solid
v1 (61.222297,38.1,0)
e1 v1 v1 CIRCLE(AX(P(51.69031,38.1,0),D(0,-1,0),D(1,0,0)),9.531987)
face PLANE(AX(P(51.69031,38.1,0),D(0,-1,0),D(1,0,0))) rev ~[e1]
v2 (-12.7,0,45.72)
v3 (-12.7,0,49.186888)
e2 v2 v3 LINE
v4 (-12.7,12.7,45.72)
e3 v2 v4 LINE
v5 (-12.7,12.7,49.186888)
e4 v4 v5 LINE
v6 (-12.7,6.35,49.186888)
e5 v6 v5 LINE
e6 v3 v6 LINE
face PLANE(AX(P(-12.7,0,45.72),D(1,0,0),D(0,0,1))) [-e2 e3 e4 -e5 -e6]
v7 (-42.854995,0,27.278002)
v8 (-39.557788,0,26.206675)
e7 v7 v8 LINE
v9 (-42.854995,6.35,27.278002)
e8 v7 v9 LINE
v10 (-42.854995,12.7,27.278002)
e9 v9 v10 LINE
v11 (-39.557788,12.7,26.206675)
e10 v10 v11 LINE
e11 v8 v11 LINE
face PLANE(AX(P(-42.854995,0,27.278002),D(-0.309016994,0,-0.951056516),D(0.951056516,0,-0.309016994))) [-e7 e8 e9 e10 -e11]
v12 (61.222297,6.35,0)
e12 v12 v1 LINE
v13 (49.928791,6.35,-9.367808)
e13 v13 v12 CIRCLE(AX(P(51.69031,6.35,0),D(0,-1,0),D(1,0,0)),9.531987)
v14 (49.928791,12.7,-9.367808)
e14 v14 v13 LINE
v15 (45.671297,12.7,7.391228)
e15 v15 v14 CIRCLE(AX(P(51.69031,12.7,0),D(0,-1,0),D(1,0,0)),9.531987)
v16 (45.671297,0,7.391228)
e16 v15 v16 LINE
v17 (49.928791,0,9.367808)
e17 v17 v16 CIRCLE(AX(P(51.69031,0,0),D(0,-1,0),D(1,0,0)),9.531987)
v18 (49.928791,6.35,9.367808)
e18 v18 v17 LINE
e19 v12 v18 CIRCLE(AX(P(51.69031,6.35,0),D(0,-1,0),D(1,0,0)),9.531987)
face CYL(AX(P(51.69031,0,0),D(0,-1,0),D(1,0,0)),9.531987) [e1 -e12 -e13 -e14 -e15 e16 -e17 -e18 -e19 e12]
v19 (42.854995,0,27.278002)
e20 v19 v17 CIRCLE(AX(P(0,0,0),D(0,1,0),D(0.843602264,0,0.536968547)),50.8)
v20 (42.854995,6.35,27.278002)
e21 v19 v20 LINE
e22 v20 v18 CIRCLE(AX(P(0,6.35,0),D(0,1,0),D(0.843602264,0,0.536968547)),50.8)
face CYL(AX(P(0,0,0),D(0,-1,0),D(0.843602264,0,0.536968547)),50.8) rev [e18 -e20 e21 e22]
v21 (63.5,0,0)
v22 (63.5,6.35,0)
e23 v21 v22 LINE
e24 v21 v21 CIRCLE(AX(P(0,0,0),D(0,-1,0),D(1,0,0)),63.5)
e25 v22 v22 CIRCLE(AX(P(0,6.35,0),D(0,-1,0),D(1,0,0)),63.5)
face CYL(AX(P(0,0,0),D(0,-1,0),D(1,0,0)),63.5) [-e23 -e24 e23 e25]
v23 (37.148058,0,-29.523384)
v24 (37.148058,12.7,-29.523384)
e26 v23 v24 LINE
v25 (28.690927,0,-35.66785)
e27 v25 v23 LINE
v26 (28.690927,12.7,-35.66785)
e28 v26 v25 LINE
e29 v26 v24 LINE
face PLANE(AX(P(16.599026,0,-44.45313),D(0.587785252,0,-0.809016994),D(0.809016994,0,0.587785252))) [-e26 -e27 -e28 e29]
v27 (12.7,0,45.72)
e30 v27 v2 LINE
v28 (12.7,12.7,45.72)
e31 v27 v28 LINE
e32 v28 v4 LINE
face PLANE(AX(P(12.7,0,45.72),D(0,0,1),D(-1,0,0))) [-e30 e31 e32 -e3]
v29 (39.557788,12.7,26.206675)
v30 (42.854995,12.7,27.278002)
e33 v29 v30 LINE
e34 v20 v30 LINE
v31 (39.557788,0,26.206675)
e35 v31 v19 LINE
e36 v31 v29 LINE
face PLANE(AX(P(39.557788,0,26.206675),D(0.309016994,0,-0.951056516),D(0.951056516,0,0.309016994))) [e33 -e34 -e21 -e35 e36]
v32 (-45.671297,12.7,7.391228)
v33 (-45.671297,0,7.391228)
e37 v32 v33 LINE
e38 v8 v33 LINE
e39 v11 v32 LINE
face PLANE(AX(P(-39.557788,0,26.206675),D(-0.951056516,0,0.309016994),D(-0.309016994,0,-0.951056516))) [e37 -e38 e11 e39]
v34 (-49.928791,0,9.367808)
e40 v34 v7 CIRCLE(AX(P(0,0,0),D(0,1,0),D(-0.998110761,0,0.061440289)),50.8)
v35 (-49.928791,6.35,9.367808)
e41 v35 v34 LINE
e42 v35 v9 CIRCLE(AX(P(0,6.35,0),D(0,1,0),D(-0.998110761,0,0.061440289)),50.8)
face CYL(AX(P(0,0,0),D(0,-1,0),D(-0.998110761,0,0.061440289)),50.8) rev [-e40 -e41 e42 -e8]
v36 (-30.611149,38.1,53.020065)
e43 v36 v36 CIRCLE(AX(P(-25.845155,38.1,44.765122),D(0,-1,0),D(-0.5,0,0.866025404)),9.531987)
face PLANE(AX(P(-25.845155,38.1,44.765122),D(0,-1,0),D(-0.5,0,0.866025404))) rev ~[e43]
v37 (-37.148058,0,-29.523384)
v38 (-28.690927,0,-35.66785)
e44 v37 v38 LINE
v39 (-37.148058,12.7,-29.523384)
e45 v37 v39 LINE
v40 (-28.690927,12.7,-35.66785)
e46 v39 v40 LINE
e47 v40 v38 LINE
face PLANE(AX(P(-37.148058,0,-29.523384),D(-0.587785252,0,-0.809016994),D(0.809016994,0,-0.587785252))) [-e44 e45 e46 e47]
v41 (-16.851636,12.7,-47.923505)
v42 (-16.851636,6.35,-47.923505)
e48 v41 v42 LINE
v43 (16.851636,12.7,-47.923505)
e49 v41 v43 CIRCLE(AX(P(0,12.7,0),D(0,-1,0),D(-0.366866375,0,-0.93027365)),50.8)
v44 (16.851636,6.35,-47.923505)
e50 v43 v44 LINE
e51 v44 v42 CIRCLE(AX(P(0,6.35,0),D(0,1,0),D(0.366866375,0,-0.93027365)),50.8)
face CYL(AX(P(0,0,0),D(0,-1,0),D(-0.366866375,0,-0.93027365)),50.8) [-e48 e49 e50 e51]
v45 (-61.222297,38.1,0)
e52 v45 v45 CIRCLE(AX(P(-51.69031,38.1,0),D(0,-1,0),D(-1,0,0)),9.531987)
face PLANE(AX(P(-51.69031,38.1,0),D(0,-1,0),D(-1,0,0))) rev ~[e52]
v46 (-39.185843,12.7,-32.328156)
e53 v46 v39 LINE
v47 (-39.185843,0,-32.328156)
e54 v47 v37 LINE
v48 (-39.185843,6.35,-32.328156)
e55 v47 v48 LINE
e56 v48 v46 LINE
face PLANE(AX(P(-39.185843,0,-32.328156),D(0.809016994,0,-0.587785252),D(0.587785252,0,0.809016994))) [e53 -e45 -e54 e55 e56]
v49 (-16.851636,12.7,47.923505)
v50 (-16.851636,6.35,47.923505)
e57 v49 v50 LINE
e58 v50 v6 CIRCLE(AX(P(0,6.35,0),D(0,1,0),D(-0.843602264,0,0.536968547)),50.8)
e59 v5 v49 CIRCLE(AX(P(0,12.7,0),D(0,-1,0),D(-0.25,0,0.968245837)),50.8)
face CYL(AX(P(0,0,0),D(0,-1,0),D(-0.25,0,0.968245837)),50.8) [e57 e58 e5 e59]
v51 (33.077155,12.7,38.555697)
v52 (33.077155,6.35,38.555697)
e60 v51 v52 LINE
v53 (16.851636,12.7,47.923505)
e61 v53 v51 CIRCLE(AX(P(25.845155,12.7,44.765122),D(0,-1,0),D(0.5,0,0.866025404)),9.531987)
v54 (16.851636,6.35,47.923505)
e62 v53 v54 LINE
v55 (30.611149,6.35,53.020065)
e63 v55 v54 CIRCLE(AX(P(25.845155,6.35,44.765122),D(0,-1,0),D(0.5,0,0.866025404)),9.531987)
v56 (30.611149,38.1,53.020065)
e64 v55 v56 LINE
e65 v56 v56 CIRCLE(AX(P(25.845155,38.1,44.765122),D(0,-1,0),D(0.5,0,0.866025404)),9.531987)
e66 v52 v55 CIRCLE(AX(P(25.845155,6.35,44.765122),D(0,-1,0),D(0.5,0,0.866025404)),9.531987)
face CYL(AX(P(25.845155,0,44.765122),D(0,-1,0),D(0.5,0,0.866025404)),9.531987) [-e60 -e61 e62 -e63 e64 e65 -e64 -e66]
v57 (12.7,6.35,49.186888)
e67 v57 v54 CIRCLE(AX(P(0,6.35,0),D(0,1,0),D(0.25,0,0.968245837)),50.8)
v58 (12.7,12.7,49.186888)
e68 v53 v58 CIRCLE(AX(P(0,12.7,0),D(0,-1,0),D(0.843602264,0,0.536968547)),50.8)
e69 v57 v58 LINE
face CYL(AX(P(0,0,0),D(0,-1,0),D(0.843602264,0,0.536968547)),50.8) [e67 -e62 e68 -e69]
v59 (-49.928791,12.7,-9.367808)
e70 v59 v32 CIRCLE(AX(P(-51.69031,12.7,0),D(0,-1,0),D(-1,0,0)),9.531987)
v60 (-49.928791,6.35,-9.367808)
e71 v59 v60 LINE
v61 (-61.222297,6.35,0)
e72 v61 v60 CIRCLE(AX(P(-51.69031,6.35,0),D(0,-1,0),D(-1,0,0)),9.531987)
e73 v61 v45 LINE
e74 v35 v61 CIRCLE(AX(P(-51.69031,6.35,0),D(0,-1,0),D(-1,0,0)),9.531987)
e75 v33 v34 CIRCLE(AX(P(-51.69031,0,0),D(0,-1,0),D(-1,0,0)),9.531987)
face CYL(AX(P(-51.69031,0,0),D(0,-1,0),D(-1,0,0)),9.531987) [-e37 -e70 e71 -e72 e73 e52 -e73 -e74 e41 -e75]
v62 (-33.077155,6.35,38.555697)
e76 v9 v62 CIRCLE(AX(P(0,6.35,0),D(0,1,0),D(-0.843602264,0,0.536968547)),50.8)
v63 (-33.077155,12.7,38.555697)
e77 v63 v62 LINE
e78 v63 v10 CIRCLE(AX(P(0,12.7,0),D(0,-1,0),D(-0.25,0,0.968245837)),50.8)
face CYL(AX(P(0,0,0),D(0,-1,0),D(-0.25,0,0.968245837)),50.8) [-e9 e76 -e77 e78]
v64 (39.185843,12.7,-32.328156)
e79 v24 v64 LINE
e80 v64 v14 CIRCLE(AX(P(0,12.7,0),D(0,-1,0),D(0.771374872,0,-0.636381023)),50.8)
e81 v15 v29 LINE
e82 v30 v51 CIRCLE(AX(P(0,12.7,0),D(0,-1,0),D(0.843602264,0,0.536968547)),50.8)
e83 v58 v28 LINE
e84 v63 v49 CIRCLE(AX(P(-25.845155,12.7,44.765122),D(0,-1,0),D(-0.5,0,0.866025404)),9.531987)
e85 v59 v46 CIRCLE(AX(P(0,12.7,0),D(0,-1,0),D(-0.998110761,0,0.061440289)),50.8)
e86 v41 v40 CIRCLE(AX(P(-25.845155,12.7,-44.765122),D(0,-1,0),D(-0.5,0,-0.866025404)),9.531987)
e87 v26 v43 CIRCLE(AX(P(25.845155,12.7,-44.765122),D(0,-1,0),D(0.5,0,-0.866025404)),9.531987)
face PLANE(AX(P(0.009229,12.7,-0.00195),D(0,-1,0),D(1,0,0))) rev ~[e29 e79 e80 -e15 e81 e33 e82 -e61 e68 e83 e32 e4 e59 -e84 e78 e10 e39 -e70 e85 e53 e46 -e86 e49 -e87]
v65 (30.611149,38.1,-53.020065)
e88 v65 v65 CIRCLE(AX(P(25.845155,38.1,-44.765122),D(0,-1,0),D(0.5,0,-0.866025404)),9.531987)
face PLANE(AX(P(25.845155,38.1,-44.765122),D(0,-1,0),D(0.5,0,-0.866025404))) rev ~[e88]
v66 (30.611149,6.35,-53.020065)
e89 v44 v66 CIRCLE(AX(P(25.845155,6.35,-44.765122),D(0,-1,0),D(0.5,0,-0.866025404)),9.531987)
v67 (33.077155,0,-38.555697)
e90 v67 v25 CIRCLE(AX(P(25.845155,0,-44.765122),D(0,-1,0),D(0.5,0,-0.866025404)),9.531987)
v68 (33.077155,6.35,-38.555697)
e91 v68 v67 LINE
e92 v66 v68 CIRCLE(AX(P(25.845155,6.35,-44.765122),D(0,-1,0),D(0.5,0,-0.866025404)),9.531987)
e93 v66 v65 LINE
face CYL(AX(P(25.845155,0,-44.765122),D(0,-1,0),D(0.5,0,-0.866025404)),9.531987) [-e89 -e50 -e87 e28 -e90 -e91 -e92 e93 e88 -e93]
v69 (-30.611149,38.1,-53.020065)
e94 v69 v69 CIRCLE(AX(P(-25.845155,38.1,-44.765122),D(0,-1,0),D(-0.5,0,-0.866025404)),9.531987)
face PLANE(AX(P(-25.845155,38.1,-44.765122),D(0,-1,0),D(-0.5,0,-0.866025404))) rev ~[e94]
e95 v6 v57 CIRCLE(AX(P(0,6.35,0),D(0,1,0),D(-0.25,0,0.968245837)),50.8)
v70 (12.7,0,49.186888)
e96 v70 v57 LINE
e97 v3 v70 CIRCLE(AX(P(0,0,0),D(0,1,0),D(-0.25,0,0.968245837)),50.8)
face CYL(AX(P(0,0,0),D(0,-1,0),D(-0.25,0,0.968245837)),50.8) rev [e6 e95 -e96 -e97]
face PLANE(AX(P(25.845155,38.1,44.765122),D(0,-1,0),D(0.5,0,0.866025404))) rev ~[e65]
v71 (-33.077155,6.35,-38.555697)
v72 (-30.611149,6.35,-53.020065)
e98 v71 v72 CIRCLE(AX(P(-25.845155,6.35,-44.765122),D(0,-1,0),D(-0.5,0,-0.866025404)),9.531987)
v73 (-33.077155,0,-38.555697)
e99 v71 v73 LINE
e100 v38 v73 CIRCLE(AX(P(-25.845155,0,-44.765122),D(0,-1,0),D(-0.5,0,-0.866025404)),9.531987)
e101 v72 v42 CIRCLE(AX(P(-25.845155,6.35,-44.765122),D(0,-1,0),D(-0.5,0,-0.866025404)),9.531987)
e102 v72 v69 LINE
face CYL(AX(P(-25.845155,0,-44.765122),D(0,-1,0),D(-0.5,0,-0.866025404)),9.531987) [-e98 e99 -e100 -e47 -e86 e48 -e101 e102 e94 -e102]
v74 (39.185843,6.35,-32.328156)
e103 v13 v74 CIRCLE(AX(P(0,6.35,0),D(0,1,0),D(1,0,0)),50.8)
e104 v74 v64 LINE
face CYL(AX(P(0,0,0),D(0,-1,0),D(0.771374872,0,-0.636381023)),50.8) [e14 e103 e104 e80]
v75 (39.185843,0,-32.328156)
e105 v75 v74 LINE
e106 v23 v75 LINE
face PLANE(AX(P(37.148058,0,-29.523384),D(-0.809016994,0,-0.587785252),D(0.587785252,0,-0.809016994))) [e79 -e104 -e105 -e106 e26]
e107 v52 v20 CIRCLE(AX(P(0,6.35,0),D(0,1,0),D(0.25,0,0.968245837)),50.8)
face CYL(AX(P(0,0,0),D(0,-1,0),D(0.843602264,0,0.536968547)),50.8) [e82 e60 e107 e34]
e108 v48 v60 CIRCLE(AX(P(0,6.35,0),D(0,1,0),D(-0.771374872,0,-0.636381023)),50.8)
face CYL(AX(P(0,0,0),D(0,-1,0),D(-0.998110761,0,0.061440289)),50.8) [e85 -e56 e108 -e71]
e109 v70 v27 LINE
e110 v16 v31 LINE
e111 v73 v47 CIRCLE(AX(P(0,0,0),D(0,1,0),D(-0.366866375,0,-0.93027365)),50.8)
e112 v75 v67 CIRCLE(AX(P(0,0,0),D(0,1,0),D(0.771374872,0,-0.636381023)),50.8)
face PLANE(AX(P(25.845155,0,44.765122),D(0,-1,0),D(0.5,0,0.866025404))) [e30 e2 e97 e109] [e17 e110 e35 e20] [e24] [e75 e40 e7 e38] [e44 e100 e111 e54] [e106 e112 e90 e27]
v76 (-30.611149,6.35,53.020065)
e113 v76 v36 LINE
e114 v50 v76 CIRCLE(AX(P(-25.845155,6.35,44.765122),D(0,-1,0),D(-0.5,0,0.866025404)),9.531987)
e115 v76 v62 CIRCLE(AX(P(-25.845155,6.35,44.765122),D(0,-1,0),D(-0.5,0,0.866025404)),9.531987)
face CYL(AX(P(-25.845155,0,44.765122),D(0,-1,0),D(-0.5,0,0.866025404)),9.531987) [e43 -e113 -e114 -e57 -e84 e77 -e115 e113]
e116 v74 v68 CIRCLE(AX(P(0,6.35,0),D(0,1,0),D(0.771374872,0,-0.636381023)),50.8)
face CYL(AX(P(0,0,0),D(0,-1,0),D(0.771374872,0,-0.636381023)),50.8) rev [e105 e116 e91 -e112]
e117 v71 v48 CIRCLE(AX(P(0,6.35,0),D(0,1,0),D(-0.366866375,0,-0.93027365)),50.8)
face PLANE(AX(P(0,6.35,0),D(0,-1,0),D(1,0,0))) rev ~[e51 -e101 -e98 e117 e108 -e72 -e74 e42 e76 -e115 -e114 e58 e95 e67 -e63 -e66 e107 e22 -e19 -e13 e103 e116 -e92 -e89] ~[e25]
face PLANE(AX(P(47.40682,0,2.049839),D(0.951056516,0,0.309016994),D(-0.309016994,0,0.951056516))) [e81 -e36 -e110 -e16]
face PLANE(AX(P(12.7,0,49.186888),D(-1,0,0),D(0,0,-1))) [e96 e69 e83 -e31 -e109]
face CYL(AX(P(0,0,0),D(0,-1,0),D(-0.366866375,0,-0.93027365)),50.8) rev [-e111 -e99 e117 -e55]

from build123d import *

# Parameters (mm, degrees)
F0_R            = 63.5
F1_DEPTH        = 6.35
F2_DEPTH        = 12.7
F3_R            = 9.5319869965
F4_DEPTH        = 38.1
F4_COPIES_COUNT = 6


# Not quite as in the source:
# - a pattern or mirror of a feature is missing from the dataset's text; its kind, count and spacing are read off the source's solid


with BuildPart() as f1:
    # F0 (on Front) → F1 (new body)
    with BuildSketch(Plane.XZ):
        Circle(F0_R)
        with BuildLine():
            ThreePointArc((50.7040266498, 3.121166689), (50.7760009936, 1.5613209459), (50.8, 0))
            ThreePointArc((50.8, 0), (47.8083719104, -17.1755516731), (39.1858434932, -32.3281559902))
            Line((39.1858434932, -32.3281559902), (40.8804939154, -34.660642193))
            Line((40.8804939154, -34.660642193), (20.3314622583, -49.5903876012))
            Line((20.3314622583, -49.5903876012), (18.636811836, -47.2579013985))
            ThreePointArc((18.636811836, -47.2579013985), (0, -50.8), (-18.636811836, -47.2579013985))
            Line((-18.636811836, -47.2579013985), (-20.3314622583, -49.5903876012))
            Line((-20.3314622583, -49.5903876012), (-40.8804939154, -34.660642193))
            Line((-40.8804939154, -34.660642193), (-39.1858434932, -32.3281559902))
            ThreePointArc((-39.1858434932, -32.3281559902), (-48.3136710278, -15.6980633142), (-50.7040266498, 3.121166689))
            Line((-50.7040266498, 3.121166689), (-53.4460286321, 4.0120971402))
            Line((-53.4460286321, 4.0120971402), (-45.5969969749, 28.1689326541))
            Line((-45.5969969749, 28.1689326541), (-42.8549949926, 27.2780022029))
            ThreePointArc((-42.8549949926, 27.2780022029), (-29.8594908165, 41.0980633142), (-12.7, 49.1868884968))
            Line((-12.7, 49.1868884968), (-12.7, 52.07))
            Line((-12.7, 52.07), (12.7, 52.07))
            Line((12.7, 52.07), (12.7, 49.1868884968))
            ThreePointArc((12.7, 49.1868884968), (29.8594908165, 41.0980633142), (42.8549949926, 27.2780022029))
            Line((42.8549949926, 27.2780022029), (45.5969969749, 28.1689326541))
            Line((45.5969969749, 28.1689326541), (53.4460286321, 4.0120971402))
            Line((53.4460286321, 4.0120971402), (50.7040266498, 3.121166689))
        make_face(mode=Mode.SUBTRACT)
        with BuildLine():
            Line((-20.3314622583, -49.5903876012), (-18.636811836, -47.2579013985))
            ThreePointArc((-18.636811836, -47.2579013985), (-29.8594908165, -41.0980633142), (-39.1858434932, -32.3281559902))
            Line((-39.1858434932, -32.3281559902), (-40.8804939154, -34.660642193))
            Line((-40.8804939154, -34.660642193), (-20.3314622583, -49.5903876012))
        make_face()
        with BuildLine():
            ThreePointArc((-50.7040266498, 3.121166689), (-48.3136710278, 15.6980633142), (-42.8549949926, 27.2780022029))
            Line((-42.8549949926, 27.2780022029), (-45.5969969749, 28.1689326541))
            Line((-45.5969969749, 28.1689326541), (-53.4460286321, 4.0120971402))
            Line((-53.4460286321, 4.0120971402), (-50.7040266498, 3.121166689))
        make_face()
        with BuildLine():
            Line((40.8804939154, -34.660642193), (39.1858434932, -32.3281559902))
            ThreePointArc((39.1858434932, -32.3281559902), (29.8594908165, -41.0980633142), (18.636811836, -47.2579013985))
            Line((18.636811836, -47.2579013985), (20.3314622583, -49.5903876012))
            Line((20.3314622583, -49.5903876012), (40.8804939154, -34.660642193))
        make_face()
        with BuildLine():
            ThreePointArc((42.8549949926, 27.2780022029), (48.3136710278, 15.6980633142), (50.7040266498, 3.121166689))
            Line((50.7040266498, 3.121166689), (53.4460286321, 4.0120971402))
            Line((53.4460286321, 4.0120971402), (45.5969969749, 28.1689326541))
            Line((45.5969969749, 28.1689326541), (42.8549949926, 27.2780022029))
        make_face()
        with BuildLine():
            ThreePointArc((-12.7, 49.1868884968), (0, 50.8), (12.7, 49.1868884968))
            Line((12.7, 49.1868884968), (12.7, 52.07))
            Line((12.7, 52.07), (-12.7, 52.07))
            Line((-12.7, 52.07), (-12.7, 49.1868884968))
        make_face()
    extrude(amount=-F1_DEPTH)

    # F0 (on Front) → F2 (join)
    with BuildSketch(Plane.XZ):
        with BuildLine():
            ThreePointArc((39.1858434932, -32.3281559902), (47.8083719104, -17.1755516731), (50.8, 0))
            ThreePointArc((50.8, 0), (50.7760009936, 1.5613209459), (50.7040266498, 3.121166689))
            Line((50.7040266498, 3.121166689), (47.4068197536, 2.0498392259))
            Line((47.4068197536, 2.0498392259), (39.5577880965, 26.2066747398))
            Line((39.5577880965, 26.2066747398), (42.8549949926, 27.2780022029))
            ThreePointArc((42.8549949926, 27.2780022029), (29.8594908165, 41.0980633142), (12.7, 49.1868884968))
            Line((12.7, 49.1868884968), (12.7, 45.72))
            Line((12.7, 45.72), (-12.7, 45.72))
            Line((-12.7, 45.72), (-12.7, 49.1868884968))
            ThreePointArc((-12.7, 49.1868884968), (-29.8594908165, 41.0980633142), (-42.8549949926, 27.2780022029))
            Line((-42.8549949926, 27.2780022029), (-39.5577880965, 26.2066747398))
            Line((-39.5577880965, 26.2066747398), (-47.4068197536, 2.0498392259))
            Line((-47.4068197536, 2.0498392259), (-50.7040266498, 3.121166689))
            ThreePointArc((-50.7040266498, 3.121166689), (-48.3136710278, -15.6980633142), (-39.1858434932, -32.3281559902))
            Line((-39.1858434932, -32.3281559902), (-37.1480575634, -29.5233842787))
            Line((-37.1480575634, -29.5233842787), (-16.5990259063, -44.4531296869))
            Line((-16.5990259063, -44.4531296869), (-18.636811836, -47.2579013985))
            ThreePointArc((-18.636811836, -47.2579013985), (0, -50.8), (18.636811836, -47.2579013985))
            Line((18.636811836, -47.2579013985), (16.5990259063, -44.4531296869))
            Line((16.5990259063, -44.4531296869), (37.1480575634, -29.5233842787))
            Line((37.1480575634, -29.5233842787), (39.1858434932, -32.3281559902))
        make_face()
    extrude(amount=-F2_DEPTH)

    # F3 (on Front) → F4 (join)
    with BuildSketch(Plane.XZ):
        with Locations((51.6903102398, 0)):
            Circle(F3_R)
    f4 = extrude(amount=-F4_DEPTH)

    # F4_copies: F4 ×6 about axis
    f4_copies_axis = Axis((0, 0, 0), (0, 1, 0))
    for i in range(1, F4_COPIES_COUNT):
        add(f4.rotate(f4_copies_axis, i * 360 / F4_COPIES_COUNT))


solid = f1.part
